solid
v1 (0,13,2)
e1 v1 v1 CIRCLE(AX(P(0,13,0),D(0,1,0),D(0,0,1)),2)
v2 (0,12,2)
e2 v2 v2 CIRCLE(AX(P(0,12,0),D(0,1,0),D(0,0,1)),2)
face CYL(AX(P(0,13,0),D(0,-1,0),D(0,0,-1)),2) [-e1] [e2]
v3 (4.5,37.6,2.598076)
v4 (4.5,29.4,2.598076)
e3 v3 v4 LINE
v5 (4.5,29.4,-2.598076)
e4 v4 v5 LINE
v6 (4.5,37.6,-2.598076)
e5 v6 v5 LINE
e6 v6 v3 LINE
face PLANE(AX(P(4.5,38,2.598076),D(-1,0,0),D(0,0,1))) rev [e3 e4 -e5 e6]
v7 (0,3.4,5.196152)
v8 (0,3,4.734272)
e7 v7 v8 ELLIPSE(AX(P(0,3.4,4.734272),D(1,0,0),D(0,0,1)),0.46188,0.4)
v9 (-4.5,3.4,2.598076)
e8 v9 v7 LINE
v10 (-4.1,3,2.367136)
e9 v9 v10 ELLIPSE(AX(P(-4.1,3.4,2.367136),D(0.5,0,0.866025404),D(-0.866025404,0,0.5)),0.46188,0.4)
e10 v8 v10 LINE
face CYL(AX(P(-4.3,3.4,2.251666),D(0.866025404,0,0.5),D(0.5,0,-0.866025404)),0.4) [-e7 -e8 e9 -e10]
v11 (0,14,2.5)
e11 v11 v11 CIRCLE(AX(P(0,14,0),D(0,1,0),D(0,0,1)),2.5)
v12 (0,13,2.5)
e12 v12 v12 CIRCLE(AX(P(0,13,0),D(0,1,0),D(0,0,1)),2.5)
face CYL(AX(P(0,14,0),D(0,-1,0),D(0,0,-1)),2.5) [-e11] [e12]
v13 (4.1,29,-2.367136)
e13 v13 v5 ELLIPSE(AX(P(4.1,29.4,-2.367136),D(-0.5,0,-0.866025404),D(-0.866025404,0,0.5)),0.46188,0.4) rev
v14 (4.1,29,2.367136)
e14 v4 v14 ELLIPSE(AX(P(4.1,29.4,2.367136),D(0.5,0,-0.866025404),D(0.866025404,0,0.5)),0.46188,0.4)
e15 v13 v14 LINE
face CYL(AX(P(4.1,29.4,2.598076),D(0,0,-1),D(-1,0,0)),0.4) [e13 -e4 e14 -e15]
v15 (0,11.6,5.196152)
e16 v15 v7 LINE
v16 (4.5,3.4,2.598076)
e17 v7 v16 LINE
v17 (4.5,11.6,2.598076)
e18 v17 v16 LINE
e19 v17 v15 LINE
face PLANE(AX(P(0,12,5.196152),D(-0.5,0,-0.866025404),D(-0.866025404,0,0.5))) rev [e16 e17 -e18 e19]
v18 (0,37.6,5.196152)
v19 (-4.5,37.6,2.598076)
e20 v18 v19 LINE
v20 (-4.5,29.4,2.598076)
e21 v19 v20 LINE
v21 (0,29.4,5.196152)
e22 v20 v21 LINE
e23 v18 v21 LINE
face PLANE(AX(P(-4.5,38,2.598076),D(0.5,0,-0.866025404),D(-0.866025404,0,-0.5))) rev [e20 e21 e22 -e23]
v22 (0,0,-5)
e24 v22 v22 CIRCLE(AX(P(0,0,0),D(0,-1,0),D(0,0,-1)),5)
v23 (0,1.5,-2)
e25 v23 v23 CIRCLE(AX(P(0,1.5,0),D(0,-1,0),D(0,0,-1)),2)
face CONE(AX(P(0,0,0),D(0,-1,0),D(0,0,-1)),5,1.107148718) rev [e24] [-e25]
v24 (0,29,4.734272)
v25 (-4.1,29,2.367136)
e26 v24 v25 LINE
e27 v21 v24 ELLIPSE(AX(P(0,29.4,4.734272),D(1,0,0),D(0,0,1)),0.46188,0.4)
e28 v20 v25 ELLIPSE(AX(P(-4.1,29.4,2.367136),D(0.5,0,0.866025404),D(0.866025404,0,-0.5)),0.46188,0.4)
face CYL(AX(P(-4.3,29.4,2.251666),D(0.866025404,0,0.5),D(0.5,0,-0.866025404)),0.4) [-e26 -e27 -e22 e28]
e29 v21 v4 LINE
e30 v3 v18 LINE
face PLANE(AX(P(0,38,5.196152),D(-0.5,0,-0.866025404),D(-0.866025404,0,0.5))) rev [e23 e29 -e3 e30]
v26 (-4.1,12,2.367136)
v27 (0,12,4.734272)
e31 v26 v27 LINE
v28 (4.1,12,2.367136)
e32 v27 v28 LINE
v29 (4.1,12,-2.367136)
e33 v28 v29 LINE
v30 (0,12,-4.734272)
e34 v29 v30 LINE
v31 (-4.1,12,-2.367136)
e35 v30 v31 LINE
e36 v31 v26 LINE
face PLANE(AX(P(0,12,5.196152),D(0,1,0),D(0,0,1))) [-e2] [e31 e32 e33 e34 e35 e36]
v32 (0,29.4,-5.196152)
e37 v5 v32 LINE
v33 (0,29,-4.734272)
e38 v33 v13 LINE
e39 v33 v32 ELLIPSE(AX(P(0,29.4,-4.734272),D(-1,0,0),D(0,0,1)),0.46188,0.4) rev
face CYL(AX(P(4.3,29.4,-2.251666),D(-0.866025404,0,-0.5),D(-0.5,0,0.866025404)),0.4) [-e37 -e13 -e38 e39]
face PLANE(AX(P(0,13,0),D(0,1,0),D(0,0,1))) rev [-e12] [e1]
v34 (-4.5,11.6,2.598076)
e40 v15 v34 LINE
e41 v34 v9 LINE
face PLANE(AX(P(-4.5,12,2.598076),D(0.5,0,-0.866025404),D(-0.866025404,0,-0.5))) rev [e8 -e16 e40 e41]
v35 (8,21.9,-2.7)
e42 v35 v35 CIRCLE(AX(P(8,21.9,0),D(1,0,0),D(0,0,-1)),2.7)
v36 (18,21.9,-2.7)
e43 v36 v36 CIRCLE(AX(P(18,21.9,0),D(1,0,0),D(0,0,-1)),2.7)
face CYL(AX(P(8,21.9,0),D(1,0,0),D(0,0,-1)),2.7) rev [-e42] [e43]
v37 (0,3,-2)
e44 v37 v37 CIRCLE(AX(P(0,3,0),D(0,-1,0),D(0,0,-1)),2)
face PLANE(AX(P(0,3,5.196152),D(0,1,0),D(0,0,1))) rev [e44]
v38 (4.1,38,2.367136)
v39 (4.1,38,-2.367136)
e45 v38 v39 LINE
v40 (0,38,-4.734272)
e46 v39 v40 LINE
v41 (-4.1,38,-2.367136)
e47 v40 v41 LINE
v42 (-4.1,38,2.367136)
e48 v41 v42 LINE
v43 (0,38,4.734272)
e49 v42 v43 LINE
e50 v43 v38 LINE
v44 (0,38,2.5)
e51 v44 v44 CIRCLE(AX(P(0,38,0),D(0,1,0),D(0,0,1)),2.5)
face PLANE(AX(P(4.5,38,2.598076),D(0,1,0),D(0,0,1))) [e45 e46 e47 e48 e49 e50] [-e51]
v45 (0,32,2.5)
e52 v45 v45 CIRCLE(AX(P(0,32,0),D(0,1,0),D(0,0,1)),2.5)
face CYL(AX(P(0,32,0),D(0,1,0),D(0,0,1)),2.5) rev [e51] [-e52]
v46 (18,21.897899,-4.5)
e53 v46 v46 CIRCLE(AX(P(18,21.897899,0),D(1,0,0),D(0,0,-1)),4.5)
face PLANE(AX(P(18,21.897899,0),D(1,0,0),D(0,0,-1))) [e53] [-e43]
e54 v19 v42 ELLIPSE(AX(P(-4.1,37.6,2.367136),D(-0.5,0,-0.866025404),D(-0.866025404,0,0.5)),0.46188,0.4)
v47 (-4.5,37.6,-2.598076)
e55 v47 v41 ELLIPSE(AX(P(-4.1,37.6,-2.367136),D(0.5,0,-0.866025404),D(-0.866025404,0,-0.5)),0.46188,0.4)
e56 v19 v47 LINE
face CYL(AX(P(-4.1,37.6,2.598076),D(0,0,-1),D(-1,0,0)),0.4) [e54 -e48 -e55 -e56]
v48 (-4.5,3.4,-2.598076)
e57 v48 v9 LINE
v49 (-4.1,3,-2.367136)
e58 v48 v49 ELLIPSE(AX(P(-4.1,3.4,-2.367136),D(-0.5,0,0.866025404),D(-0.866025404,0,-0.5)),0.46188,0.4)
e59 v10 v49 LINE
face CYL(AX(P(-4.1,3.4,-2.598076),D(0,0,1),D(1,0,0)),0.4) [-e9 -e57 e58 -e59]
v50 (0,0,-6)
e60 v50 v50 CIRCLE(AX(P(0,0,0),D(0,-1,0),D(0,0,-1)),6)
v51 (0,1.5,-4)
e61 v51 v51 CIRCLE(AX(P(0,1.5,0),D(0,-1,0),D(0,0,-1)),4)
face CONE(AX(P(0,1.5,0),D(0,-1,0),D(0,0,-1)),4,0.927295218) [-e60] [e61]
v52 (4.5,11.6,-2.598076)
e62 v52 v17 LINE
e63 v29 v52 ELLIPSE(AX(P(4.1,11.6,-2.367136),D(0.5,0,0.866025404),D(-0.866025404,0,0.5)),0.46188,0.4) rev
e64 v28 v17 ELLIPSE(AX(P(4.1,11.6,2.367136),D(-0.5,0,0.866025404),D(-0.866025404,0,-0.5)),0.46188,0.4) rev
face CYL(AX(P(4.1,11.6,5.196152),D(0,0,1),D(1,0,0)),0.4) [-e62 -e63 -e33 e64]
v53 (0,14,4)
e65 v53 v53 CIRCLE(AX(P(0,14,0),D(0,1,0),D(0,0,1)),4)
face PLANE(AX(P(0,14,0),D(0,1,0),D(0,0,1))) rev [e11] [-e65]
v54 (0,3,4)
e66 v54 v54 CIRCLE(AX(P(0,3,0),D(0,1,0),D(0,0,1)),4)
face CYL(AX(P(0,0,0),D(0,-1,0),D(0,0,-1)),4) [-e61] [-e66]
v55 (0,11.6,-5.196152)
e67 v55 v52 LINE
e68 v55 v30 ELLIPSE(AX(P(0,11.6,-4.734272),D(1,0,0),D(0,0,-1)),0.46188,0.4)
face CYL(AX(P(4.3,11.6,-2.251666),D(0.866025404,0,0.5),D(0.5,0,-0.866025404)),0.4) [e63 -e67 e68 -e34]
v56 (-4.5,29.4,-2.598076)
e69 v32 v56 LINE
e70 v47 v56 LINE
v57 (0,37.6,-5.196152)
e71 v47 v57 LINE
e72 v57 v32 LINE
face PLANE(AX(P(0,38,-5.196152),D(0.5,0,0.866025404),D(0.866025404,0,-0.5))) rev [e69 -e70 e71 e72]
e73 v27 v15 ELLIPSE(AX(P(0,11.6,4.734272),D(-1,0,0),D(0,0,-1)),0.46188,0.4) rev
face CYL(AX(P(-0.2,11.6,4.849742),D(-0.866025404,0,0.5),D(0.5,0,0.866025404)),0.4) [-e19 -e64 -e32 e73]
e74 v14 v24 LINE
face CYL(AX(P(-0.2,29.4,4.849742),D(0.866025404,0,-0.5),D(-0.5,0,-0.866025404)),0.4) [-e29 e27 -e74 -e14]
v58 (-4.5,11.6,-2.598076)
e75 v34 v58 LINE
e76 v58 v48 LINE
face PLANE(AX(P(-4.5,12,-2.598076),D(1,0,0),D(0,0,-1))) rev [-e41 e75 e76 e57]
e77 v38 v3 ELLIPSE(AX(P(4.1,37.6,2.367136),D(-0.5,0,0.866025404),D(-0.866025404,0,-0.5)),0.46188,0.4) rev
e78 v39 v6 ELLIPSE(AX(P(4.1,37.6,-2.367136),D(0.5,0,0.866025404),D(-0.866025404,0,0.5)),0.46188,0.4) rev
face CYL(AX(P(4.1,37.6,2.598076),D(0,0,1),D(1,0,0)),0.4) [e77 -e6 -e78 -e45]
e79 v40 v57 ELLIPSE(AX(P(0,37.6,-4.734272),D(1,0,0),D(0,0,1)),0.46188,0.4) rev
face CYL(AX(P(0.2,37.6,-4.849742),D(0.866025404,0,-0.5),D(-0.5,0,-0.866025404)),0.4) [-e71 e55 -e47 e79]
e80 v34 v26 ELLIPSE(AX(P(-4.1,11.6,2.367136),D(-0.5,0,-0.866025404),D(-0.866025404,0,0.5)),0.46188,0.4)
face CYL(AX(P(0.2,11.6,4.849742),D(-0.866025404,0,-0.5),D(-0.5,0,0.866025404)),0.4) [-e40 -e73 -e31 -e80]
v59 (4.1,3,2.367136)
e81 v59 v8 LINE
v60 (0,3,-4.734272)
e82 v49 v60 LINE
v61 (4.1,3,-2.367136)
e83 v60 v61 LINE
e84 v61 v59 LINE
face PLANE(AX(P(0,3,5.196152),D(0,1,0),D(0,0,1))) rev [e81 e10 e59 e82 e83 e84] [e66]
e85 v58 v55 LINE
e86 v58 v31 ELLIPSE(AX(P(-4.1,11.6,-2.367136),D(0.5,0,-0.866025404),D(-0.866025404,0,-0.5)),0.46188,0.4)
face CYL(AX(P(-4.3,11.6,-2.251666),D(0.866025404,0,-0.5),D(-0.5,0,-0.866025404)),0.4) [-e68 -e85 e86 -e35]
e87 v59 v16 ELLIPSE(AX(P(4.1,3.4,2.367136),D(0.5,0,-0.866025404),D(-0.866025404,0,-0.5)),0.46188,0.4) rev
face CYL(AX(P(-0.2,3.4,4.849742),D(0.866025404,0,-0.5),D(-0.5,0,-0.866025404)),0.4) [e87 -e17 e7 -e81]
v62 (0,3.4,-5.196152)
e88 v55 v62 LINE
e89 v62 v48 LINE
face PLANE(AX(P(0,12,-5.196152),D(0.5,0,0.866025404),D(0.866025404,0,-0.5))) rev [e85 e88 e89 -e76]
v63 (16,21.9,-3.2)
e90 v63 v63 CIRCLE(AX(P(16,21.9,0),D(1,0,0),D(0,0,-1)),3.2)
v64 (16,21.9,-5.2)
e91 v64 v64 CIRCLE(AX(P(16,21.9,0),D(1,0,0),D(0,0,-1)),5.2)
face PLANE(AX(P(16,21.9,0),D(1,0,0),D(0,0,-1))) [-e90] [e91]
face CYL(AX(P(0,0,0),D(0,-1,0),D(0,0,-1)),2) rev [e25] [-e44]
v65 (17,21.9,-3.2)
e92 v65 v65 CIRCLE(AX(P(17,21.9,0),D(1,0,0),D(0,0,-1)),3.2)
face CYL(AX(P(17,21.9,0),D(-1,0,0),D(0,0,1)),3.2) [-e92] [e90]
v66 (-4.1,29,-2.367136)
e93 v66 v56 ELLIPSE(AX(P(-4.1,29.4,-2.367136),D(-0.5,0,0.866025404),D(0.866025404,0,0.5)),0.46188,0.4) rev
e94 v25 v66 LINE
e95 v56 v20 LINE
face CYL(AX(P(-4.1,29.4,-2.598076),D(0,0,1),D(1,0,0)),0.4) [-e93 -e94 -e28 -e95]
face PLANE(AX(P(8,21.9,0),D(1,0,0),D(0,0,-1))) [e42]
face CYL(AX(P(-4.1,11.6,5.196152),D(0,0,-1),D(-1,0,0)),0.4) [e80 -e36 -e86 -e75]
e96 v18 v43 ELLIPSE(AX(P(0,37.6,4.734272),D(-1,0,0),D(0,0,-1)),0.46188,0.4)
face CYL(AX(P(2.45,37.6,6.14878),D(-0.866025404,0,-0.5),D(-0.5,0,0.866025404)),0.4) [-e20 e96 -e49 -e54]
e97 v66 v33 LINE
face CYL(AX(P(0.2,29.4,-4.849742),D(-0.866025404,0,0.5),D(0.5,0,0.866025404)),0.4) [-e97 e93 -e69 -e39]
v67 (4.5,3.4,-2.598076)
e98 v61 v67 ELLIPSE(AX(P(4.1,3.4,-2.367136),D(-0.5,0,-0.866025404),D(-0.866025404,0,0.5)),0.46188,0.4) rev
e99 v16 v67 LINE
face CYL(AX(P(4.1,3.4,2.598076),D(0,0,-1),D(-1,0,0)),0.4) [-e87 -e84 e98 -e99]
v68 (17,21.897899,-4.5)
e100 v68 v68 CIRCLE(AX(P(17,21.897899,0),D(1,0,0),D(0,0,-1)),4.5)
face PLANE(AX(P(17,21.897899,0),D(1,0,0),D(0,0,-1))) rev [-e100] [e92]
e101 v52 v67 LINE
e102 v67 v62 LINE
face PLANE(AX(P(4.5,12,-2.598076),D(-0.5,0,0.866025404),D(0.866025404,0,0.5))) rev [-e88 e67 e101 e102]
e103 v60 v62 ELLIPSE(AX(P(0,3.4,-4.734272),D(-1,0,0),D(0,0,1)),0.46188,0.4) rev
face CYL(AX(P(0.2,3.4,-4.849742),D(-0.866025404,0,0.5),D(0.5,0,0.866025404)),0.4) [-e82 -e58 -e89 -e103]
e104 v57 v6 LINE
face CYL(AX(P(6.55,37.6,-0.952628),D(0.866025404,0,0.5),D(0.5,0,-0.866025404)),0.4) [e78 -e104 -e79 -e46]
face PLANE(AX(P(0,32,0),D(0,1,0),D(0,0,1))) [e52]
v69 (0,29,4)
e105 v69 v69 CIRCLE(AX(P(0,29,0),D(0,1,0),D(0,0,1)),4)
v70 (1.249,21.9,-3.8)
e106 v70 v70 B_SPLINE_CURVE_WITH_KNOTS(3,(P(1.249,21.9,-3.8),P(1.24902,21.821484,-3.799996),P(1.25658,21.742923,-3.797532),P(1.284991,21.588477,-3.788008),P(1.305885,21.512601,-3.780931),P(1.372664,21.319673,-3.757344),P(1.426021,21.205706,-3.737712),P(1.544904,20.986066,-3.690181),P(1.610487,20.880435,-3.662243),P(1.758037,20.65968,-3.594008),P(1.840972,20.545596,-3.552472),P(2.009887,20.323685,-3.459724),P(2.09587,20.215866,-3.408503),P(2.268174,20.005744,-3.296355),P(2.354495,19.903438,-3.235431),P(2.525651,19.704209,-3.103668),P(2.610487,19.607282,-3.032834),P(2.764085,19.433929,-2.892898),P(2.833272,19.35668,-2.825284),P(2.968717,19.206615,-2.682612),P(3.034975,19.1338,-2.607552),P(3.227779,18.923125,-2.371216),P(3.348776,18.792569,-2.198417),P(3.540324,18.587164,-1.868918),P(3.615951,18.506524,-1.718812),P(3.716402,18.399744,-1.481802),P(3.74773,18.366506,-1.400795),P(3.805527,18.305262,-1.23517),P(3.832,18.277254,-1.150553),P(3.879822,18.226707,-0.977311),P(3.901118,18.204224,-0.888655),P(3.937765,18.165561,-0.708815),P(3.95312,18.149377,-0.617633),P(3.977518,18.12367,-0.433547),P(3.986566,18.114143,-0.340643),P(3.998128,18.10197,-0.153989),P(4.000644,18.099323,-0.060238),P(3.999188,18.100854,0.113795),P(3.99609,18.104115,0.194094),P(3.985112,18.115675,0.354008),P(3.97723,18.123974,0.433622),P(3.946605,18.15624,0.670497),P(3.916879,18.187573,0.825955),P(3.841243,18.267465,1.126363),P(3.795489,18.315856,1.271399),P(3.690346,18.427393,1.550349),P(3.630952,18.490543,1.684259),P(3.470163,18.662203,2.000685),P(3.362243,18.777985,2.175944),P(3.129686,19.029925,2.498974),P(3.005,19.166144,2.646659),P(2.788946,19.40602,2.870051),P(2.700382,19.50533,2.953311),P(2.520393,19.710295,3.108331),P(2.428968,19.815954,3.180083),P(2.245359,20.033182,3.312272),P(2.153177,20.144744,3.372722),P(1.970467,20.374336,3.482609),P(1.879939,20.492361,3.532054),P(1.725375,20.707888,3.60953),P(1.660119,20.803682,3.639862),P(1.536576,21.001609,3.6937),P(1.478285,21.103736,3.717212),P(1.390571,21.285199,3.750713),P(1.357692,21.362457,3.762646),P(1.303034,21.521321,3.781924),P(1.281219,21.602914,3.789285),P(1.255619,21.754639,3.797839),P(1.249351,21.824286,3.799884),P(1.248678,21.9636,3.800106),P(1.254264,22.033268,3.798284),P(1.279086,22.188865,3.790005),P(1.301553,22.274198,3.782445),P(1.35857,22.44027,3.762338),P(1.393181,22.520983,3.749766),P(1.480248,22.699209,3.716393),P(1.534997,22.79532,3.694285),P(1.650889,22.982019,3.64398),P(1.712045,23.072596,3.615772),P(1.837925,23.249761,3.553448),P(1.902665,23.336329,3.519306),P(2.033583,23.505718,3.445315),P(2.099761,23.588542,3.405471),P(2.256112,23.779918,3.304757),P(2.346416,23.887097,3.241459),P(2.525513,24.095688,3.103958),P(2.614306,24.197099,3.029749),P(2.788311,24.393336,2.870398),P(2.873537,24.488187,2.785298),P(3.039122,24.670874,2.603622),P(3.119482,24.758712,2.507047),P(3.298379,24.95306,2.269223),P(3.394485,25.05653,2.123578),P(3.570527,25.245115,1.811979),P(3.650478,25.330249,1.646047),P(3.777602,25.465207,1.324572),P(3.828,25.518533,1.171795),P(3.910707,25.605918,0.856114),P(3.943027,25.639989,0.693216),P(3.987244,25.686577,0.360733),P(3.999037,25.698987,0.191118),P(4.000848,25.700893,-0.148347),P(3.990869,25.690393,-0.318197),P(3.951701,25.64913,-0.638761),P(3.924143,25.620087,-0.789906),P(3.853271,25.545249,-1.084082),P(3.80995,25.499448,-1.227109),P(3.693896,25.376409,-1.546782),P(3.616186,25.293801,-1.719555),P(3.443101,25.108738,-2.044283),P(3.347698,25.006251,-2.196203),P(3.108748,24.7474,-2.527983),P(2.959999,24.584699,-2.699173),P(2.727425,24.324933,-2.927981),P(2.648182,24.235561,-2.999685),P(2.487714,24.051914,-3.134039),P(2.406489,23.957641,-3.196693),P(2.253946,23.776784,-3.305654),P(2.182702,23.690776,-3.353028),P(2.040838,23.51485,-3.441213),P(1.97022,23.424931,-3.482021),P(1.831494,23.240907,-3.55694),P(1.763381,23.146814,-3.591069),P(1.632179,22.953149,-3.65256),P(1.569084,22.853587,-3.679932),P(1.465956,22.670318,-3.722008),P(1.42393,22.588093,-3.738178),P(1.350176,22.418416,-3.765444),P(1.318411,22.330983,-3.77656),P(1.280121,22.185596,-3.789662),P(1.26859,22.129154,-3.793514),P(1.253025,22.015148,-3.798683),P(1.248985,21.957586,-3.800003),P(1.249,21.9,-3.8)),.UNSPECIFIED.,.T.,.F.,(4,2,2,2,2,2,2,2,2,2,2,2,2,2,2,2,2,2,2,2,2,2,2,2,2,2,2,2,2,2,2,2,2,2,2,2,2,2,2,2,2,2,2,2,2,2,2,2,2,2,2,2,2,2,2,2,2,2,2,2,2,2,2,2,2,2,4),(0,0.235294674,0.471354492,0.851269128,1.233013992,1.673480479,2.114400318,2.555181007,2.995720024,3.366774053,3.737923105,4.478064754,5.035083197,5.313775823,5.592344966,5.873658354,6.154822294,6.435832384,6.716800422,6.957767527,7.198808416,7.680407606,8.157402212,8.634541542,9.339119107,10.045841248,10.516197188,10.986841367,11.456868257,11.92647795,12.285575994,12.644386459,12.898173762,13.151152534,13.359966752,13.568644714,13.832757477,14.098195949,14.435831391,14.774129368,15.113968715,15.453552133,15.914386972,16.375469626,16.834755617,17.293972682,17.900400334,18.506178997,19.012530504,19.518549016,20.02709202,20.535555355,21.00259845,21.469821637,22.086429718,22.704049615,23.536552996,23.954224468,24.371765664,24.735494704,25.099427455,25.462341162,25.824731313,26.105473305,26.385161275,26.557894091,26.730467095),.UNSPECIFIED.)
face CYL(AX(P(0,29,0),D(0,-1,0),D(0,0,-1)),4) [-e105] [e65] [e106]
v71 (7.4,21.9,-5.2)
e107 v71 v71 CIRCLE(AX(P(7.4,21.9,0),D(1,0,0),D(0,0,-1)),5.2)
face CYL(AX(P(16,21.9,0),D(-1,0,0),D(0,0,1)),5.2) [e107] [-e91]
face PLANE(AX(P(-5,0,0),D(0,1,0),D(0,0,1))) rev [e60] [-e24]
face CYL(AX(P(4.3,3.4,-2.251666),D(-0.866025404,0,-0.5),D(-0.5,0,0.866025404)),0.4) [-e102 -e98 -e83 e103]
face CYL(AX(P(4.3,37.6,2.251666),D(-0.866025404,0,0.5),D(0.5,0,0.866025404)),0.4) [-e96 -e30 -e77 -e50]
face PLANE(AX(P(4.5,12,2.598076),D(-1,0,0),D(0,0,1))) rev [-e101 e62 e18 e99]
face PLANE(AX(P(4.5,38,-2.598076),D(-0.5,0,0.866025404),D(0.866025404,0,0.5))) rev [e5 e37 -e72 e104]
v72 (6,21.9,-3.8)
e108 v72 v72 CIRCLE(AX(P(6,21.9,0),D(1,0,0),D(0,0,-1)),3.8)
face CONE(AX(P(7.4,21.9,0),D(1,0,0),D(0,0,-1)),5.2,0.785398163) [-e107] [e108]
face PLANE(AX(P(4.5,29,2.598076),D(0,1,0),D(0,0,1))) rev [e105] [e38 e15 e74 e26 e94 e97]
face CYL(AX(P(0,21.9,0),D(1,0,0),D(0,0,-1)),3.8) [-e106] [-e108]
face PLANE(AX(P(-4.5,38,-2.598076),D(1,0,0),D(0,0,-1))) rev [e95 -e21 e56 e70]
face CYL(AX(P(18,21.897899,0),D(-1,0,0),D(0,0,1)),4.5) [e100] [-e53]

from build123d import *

# Parameters (mm, degrees)
BOSS_EXTRU_1_DEPTH      = 9
ESQUISSE3_R             = 2
BOSS_EXTRU_2_DEPTH      = 1
ESQUISSE4_R             = 2.5
BOSS_EXTRU_3_DEPTH      = 1
BOSS_EXTRU_4_START      = 15
ESQUISSE5_R             = 4
BOSS_EXTRU_4_DEPTH      = 15
BOSS_EXTRU_5_DEPTH      = 9
BOSS_EXTRU_6_DEPTH      = 2
BOSS_EXTRU_6_DEPTH_BACK = 4
ESQUISSE7_R             = 3.8
ESQUISSE8_R             = 5.2
BOSS_EXTRU_7_DEPTH      = 10
ESQUISSE9_R             = 3.2
BOSS_EXTRU_8_DEPTH      = 1
ESQUISSE10_R            = 4.5
BOSS_EXTRU_9_DEPTH      = 1
ESQUISSE11_R            = 2.7
ENL_V_MAT_EXTRU_1_DEPTH = 10
ENL_V_START             = -6
ESQUISSE12_R            = 2.5
ENL_V_MAT_EXTRU_2_DEPTH = 6
CONG_1_R                = 0.4
CHANFREIN1_SIZE         = 1.4


with BuildPart() as part:
    # Esquisse1 → Révolution1 (revolve)
    with BuildSketch(Plane.XY, mode=Mode.PRIVATE) as r_volution1_sk:
        Polygon((-5, 0), (-6, 0), (-4, 1.5), (-4, 3), (-2, 3), (-2, 1.5), align=None)
    revolve(r_volution1_sk.sketch.rotate(Axis((0, 0, 0), (0, 1, 0)), 270), axis=Axis((0, 0, 0), (0, 1, 0)))

    # Esquisse2 → Boss.-Extru.1 (add)
    with BuildSketch(Plane(origin=(0, 3, 0), x_dir=(1, 0, 0), z_dir=(0, 1, 0))):
        Polygon((0, -5.196152423), (4.5, -2.598076211), (4.5, 2.598076211), (0, 5.196152423), (-4.5, 2.598076211), (-4.5, -2.598076211), align=None)
    extrude(amount=BOSS_EXTRU_1_DEPTH)

    # Esquisse3 → Boss.-Extru.2 (add)
    with BuildSketch(Plane(origin=(0, 12, 0), x_dir=(1, 0, 0), z_dir=(0, 1, 0))):
        with Locations(Location((0, 0, 0), (0, 0, 90))):
            Circle(ESQUISSE3_R)
    extrude(amount=BOSS_EXTRU_2_DEPTH)

    # Esquisse4 → Boss.-Extru.3 (add)
    with BuildSketch(Plane(origin=(0, 13, 0), x_dir=(1, 0, 0), z_dir=(0, 1, 0))):
        with Locations(Location((0, 0, 0), (0, 0, 270))):
            Circle(ESQUISSE4_R)
    extrude(amount=BOSS_EXTRU_3_DEPTH)

    # Esquisse5 → Boss.-Extru.4 (add)
    with BuildSketch(Plane(origin=(0, 14, 0), x_dir=(1, 0, 0), z_dir=(0, 1, 0)).offset(BOSS_EXTRU_4_START)):
        with Locations(Location((0, 0, 0), (0, 0, 90))):
            Circle(ESQUISSE5_R)
    extrude(amount=-BOSS_EXTRU_4_DEPTH)

    # Esquisse6 → Boss.-Extru.5 (add)
    with BuildSketch(Plane(origin=(0, 29, 0), x_dir=(1, 0, 0), z_dir=(0, 1, 0))):
        Polygon((4.5, -2.598076211), (4.5, 2.598076211), (0, 5.196152423), (-4.5, 2.598076211), (-4.5, -2.598076211), (0, -5.196152423), align=None)
    extrude(amount=BOSS_EXTRU_5_DEPTH)

    # Esquisse7 → Boss.-Extru.6 (add, two sides: drawn at the far end of the back side and taken through both)
    with BuildSketch(Plane(origin=(4, 0, 0), x_dir=(0, 0, -1), z_dir=(1, 0, 0)).offset(-BOSS_EXTRU_6_DEPTH_BACK)):
        with Locations((0, 21.9)):
            Circle(ESQUISSE7_R)
    extrude(amount=BOSS_EXTRU_6_DEPTH + BOSS_EXTRU_6_DEPTH_BACK)

    # Esquisse8 → Boss.-Extru.7 (add)
    with BuildSketch(Plane(origin=(6, 0, 0), x_dir=(0, 0, -1), z_dir=(1, 0, 0))):
        with Locations((0, 21.9)):
            Circle(ESQUISSE8_R)
    extrude(amount=BOSS_EXTRU_7_DEPTH)

    # Esquisse9 → Boss.-Extru.8 (add)
    with BuildSketch(Plane(origin=(16, 0, 0), x_dir=(0, 0, -1), z_dir=(1, 0, 0))):
        with Locations((0, 21.9)):
            Circle(ESQUISSE9_R)
    extrude(amount=BOSS_EXTRU_8_DEPTH)

    # Esquisse10 → Boss.-Extru.9 (add)
    with BuildSketch(Plane(origin=(17, 0, 0), x_dir=(0, 0, -1), z_dir=(1, 0, 0))):
        with Locations((0, 21.89789892)):
            Circle(ESQUISSE10_R)
    extrude(amount=BOSS_EXTRU_9_DEPTH)

    # Esquisse11 → Enlèv. mat.-Extru.1 (cut)
    with BuildSketch(Plane(origin=(18, 0, 0), x_dir=(0, 0, -1), z_dir=(1, 0, 0))):
        with Locations((0, 21.9)):
            Circle(ESQUISSE11_R)
    extrude(amount=-ENL_V_MAT_EXTRU_1_DEPTH, mode=Mode.SUBTRACT)

    # Esquisse12 → Enlèv. mat.-Extru.2 (cut)
    with BuildSketch(Plane(origin=(0, 38, 0), x_dir=(1, 0, 0), z_dir=(0, 1, 0)).offset(ENL_V_START)):
        with Locations(Location((0, 0, 0), (0, 0, 270))):
            Circle(ESQUISSE12_R)
    extrude(amount=ENL_V_MAT_EXTRU_2_DEPTH, mode=Mode.SUBTRACT)

    # Congé1
    cong_1_edges = [part.edges().sort_by_distance(p)[0] for p in [
        (-2.25, 3, 3.897114317),
        (2.25, 3, 3.897114317),
        (4.5, 3, 0),
        (2.25, 3, -3.897114317),
        (-2.25, 3, -3.897114317),
        (-4.5, 3, 0),
        (-2.25, 12, 3.897114317),
        (2.25, 12, 3.897114317),
        (4.5, 12, 0),
        (2.25, 12, -3.897114317),
        (-2.25, 12, -3.897114317),
        (-4.5, 12, 0),
        (2.25, 29, 3.897114317),
        (4.5, 29, 0),
        (2.25, 29, -3.897114317),
        (-2.25, 29, -3.897114317),
        (-4.5, 29, 0),
        (-2.25, 29, 3.897114317),
        (2.25, 38, 3.897114317),
        (4.5, 38, 0),
        (2.25, 38, -3.897114317),
        (-2.25, 38, -3.897114317),
        (-4.5, 38, 0),
        (-2.25, 38, 3.897114317),
    ]]
    fillet(cong_1_edges, radius=CONG_1_R)

    # Chanfrein1
    chanfrein1_edges = [part.edges().sort_by_distance(p)[0] for p in [
        (6, 21.9, 5.2),
    ]]
    chamfer(chanfrein1_edges, length=CHANFREIN1_SIZE - 0.0001)  # a hair under: the kernel refuses the full size


solid = part.part
